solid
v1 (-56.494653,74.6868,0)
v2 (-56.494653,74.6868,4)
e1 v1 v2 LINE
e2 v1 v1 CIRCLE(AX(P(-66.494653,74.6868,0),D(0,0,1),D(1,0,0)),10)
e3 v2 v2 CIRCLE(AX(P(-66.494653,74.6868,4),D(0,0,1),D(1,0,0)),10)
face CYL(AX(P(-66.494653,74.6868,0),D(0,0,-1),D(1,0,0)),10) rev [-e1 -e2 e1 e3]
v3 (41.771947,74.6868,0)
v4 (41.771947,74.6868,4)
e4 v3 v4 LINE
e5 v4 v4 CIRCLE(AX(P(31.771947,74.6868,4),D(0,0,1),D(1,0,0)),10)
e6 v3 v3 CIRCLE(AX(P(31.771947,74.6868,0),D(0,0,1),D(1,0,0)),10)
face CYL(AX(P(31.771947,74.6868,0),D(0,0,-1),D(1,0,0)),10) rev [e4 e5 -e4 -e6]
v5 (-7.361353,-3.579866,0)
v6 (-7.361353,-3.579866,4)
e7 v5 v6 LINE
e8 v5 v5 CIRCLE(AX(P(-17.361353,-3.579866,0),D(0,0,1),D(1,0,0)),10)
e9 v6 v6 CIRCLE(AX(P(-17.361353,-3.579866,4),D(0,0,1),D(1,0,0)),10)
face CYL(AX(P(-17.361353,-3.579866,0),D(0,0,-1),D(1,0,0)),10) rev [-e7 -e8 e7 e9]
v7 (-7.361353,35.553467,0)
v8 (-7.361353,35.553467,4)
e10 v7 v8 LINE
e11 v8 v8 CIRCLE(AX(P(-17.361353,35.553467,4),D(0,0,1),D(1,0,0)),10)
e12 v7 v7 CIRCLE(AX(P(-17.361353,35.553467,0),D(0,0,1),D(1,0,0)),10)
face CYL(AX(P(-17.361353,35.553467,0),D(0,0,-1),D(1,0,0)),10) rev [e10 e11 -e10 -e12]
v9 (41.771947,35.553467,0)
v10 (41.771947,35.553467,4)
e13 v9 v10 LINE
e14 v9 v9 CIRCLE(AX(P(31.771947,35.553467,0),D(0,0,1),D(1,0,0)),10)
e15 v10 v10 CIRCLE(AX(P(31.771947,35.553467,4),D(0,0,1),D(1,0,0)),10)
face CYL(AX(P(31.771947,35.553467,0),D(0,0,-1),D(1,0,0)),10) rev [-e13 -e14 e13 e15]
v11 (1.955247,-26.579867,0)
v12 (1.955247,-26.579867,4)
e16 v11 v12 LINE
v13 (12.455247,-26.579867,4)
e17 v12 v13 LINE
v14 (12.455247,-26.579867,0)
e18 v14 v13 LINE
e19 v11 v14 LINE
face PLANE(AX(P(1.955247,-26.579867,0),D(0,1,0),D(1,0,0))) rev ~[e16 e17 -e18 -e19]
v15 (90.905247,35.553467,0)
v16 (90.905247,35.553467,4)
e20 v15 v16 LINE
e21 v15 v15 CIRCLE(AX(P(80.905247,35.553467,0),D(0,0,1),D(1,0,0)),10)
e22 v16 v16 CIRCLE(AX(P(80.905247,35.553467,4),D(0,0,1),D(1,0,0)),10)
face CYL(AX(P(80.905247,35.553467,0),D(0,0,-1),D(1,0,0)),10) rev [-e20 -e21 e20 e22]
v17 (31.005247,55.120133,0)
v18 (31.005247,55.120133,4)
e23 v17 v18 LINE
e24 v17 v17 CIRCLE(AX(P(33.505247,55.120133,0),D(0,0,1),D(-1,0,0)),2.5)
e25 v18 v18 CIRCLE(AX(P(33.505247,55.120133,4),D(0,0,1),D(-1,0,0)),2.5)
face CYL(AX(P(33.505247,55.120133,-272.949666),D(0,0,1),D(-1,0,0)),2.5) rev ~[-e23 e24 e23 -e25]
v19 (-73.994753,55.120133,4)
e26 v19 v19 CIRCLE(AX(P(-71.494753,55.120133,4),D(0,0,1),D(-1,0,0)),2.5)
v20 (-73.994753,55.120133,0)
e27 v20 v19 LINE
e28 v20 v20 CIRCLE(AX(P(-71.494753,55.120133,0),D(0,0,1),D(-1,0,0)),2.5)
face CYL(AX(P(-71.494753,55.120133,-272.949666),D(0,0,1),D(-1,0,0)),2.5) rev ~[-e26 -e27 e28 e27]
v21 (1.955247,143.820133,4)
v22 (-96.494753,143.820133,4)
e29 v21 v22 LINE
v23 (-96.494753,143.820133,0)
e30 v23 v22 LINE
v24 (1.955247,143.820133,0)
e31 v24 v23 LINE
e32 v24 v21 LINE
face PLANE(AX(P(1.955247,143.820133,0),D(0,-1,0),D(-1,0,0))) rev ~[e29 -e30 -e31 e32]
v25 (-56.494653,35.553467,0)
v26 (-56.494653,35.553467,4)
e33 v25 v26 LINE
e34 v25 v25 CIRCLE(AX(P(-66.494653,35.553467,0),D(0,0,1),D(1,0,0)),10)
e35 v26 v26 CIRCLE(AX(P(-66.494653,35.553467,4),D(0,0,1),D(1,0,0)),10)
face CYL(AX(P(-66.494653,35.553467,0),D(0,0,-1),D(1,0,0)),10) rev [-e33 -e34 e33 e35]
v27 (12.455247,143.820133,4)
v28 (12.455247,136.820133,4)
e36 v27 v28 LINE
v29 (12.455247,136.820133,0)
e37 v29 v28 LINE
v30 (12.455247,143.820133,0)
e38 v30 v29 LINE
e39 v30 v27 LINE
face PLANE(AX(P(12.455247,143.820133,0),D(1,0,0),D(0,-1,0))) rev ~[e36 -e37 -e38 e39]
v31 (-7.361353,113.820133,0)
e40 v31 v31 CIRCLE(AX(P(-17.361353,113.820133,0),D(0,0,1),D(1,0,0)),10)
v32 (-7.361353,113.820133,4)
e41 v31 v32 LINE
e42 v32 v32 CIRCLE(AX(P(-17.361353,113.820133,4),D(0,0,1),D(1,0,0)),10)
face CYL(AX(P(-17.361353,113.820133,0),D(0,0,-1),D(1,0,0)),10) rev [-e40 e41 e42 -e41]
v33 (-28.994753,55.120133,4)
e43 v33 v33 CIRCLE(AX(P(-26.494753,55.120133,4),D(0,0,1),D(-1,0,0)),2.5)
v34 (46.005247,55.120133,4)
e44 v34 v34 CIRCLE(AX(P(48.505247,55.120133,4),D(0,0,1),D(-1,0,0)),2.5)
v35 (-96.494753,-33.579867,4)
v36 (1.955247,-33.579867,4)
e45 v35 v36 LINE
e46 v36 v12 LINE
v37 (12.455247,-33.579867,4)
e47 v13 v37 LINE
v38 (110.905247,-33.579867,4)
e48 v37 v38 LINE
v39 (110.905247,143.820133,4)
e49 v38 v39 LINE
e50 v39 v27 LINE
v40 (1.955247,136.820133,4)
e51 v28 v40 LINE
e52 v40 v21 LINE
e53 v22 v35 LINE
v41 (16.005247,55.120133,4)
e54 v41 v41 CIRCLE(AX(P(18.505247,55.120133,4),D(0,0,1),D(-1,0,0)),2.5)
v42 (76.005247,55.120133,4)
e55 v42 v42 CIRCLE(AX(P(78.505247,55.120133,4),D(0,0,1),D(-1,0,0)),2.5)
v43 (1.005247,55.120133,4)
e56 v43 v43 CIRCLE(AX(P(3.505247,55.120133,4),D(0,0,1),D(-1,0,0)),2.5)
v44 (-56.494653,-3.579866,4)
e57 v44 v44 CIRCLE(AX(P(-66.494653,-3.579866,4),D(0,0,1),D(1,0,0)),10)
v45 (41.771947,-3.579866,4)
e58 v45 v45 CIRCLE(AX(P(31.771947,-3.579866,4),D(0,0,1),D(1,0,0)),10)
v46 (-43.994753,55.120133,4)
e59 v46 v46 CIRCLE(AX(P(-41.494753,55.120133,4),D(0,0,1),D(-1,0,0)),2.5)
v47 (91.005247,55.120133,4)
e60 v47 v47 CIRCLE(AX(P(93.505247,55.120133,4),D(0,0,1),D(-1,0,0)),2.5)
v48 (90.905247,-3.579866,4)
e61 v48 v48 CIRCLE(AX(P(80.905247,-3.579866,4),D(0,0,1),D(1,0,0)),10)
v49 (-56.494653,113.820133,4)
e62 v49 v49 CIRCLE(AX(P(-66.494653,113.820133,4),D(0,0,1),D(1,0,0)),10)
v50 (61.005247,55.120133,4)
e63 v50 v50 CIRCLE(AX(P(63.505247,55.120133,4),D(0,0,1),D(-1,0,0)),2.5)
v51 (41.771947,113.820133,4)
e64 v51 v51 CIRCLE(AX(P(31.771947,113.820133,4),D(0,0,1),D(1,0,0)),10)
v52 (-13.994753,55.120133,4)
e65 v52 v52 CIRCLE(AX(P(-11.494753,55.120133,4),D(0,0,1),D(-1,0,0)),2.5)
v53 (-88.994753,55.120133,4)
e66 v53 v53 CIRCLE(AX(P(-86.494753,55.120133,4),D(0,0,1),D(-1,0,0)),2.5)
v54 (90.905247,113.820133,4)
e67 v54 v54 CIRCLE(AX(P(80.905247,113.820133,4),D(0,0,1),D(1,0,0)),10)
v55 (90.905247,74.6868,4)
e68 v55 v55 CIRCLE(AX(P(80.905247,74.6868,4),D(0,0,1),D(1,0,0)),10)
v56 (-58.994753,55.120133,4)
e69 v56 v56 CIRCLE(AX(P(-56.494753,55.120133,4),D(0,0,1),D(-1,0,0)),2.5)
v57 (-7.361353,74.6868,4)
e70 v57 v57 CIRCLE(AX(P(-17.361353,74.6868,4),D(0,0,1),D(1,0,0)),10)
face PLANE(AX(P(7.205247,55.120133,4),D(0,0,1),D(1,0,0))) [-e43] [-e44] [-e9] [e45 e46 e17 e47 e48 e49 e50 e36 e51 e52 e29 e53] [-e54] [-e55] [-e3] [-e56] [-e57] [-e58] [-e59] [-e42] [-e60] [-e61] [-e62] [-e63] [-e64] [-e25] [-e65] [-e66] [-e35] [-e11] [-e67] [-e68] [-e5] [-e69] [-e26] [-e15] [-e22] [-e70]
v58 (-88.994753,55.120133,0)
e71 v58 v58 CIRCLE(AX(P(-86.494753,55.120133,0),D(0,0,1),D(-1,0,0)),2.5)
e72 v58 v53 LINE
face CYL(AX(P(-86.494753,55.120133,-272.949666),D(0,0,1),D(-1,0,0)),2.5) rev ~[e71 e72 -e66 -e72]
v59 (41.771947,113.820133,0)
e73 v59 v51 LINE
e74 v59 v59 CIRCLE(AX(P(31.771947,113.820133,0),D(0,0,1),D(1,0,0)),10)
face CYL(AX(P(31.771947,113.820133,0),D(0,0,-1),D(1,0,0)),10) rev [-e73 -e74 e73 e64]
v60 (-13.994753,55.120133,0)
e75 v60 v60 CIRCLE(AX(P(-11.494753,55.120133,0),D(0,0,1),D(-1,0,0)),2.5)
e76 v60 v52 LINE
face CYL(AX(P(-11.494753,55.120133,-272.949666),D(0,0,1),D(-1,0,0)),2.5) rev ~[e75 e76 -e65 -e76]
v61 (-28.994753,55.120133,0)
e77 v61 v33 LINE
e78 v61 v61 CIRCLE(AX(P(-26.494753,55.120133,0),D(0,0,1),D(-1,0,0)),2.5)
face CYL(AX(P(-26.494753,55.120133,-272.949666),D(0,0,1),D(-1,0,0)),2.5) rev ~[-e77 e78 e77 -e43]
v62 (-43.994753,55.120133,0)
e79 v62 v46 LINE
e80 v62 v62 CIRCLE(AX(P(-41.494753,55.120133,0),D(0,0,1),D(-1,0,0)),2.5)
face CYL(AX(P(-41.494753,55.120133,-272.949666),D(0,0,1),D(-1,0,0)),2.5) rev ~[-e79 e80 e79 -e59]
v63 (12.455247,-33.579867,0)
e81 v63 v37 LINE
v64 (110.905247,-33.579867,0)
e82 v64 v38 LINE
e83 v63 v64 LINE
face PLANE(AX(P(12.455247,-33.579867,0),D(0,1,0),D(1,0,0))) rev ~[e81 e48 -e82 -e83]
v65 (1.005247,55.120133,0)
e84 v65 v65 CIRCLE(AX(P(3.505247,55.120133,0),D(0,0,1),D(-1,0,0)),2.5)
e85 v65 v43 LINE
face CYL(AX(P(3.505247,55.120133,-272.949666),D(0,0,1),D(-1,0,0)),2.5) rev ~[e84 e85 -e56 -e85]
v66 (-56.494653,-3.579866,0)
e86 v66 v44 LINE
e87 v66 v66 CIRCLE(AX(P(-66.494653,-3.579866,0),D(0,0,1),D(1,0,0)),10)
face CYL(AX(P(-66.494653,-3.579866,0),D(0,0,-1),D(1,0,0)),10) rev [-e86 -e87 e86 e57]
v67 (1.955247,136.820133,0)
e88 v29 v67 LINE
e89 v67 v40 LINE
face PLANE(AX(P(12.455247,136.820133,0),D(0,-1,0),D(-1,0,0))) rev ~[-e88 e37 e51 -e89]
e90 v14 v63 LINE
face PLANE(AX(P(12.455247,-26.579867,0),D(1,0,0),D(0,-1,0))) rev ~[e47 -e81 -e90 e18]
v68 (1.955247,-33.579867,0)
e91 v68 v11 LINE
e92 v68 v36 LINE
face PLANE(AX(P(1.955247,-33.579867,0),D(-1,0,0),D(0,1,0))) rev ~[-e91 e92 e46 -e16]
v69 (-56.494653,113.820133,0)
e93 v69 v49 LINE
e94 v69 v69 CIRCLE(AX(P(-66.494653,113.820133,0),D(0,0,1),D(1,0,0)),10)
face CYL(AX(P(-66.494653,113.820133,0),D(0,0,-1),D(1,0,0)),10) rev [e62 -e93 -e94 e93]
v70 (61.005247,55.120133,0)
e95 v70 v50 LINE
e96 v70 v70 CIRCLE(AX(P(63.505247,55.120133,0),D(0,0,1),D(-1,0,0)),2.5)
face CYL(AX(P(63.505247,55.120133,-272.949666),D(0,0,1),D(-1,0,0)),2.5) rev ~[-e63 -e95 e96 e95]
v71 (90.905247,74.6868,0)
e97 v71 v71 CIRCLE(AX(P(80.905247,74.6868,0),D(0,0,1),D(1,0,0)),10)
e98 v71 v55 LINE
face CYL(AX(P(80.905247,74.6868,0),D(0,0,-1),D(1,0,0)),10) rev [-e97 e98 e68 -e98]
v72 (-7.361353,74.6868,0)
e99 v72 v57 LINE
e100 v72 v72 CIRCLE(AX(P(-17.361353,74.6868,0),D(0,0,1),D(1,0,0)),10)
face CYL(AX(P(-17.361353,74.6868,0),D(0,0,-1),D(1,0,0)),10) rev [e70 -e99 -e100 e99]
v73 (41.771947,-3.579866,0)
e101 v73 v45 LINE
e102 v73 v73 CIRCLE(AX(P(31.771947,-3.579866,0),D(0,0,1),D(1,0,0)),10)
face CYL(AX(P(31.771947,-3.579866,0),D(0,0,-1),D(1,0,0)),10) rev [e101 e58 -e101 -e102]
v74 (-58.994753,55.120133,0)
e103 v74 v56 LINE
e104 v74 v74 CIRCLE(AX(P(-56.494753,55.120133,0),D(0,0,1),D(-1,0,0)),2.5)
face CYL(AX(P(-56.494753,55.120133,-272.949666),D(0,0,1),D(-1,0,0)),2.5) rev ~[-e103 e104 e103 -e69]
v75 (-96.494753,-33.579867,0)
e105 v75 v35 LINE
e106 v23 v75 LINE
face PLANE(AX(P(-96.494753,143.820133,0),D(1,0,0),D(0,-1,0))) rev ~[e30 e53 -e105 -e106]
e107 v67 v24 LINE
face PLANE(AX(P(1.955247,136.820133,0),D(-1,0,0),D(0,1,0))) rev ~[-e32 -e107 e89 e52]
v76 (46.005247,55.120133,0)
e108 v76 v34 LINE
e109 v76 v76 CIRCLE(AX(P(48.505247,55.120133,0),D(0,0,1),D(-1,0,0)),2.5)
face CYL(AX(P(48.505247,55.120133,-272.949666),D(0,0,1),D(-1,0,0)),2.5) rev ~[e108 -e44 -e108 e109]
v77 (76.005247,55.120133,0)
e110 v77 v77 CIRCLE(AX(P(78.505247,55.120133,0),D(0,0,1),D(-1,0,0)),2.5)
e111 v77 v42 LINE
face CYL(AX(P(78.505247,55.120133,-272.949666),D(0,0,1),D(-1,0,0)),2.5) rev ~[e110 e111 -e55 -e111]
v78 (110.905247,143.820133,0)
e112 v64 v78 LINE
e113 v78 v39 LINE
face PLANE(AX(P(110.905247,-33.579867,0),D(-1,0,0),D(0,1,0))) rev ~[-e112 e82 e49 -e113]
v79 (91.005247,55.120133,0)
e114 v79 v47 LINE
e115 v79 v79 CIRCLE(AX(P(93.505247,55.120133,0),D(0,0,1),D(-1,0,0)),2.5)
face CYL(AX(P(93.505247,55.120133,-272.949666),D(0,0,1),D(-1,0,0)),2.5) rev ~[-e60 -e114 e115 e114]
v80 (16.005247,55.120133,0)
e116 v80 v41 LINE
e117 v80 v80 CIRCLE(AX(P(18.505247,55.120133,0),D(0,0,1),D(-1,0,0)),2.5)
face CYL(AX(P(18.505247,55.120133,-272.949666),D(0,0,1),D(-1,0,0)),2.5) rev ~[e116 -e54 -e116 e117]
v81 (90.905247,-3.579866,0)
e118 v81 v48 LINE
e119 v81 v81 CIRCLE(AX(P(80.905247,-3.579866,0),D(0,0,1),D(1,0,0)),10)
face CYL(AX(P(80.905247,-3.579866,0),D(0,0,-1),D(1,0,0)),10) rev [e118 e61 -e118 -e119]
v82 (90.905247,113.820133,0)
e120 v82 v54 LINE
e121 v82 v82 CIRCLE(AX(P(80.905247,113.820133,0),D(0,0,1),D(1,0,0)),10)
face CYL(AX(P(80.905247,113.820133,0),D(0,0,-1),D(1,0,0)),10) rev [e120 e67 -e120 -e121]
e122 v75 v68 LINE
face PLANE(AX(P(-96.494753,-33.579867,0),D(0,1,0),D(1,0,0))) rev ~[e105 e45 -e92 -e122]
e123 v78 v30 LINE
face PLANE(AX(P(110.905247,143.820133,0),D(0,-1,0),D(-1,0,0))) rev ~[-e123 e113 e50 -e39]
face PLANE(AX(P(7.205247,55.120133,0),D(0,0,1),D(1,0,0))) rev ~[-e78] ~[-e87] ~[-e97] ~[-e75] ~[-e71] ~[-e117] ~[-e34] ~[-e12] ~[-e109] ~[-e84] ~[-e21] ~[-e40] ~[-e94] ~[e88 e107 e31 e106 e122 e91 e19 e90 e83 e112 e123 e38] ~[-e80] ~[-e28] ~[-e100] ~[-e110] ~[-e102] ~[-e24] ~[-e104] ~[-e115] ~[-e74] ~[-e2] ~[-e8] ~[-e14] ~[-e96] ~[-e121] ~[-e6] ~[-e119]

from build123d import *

# Parameters (mm, degrees)
F0_R     = 10
F1_DEPTH = 4
F2_D     = 5


# Not quite as in the source:
# - a feature names something its author has since deleted; it is built from what else it names
# - the program builds the solid bodies; features that only make, move or delete a surface that nothing else refers to are left out


with BuildPart() as f1:
    # F0 (on Top) → F1 (new body)
    with BuildSketch(Plane.XY):
        Polygon((1.9552472353, 143.8201326668), (-96.4947527647, 143.8201326668), (-96.4947527647, -33.5798673332), (1.9552472353, -33.5798673332), (1.9552472353, -26.5798673332), (12.4552472353, -26.5798673332), (12.4552472353, -33.5798673332), (110.9052472353, -33.5798673332), (110.9052472353, 143.8201326668), (12.4552472353, 143.8201326668), (12.4552472353, 136.8201326668), (1.9552472353, 136.8201326668), align=None)
        with Locations((-66.4946527647, -3.5798663332)):
            Circle(F0_R, mode=Mode.SUBTRACT)
        with Locations((-17.3613527647, -3.5798663332)):
            Circle(F0_R, mode=Mode.SUBTRACT)
        with Locations((-66.4946527647, 35.5534666668)):
            Circle(F0_R, mode=Mode.SUBTRACT)
        with Locations((-17.3613527647, 35.5534666668)):
            Circle(F0_R, mode=Mode.SUBTRACT)
        with Locations((31.7719472353, -3.5798663332)):
            Circle(F0_R, mode=Mode.SUBTRACT)
        with Locations((80.9052472353, -3.5798663332)):
            Circle(F0_R, mode=Mode.SUBTRACT)
        with Locations((31.7719472353, 35.5534666668)):
            Circle(F0_R, mode=Mode.SUBTRACT)
        with Locations((80.9052472353, 35.5534666668)):
            Circle(F0_R, mode=Mode.SUBTRACT)
        with Locations((-66.4946527647, 74.6867996668)):
            Circle(F0_R, mode=Mode.SUBTRACT)
        with Locations((-17.3613527647, 74.6867996668)):
            Circle(F0_R, mode=Mode.SUBTRACT)
        with Locations((-66.4946527647, 113.8201326668)):
            Circle(F0_R, mode=Mode.SUBTRACT)
        with Locations((-17.3613527647, 113.8201326668)):
            Circle(F0_R, mode=Mode.SUBTRACT)
        with Locations((31.7719472353, 74.6867996668)):
            Circle(F0_R, mode=Mode.SUBTRACT)
        with Locations((80.9052472353, 74.6867996668)):
            Circle(F0_R, mode=Mode.SUBTRACT)
        with Locations((31.7719472353, 113.8201326668)):
            Circle(F0_R, mode=Mode.SUBTRACT)
        with Locations((80.9052472353, 113.8201326668)):
            Circle(F0_R, mode=Mode.SUBTRACT)
    extrude(amount=F1_DEPTH)

    # F2 (through all)
    with Locations(Plane(origin=(0, 0, 0), x_dir=(1, 0, 0), z_dir=(0, 0, -1))):
        with Locations((18.5052472353, -55.1201326668), (-11.4947527647, -55.1201326668), (-56.4947527647, -55.1201326668), (93.5052472353, -55.1201326668), (-26.4947527647, -55.1201326668), (78.5052472353, -55.1201326668), (63.5052472353, -55.1201326668), (-71.4947527647, -55.1201326668), (33.5052472353, -55.1201326668), (-41.4947527647, -55.1201326668), (3.5052472353, -55.1201326668), (48.5052472353, -55.1201326668), (-86.4947527647, -55.1201326668)):
            Hole(F2_D / 2)


solid = f1.part
